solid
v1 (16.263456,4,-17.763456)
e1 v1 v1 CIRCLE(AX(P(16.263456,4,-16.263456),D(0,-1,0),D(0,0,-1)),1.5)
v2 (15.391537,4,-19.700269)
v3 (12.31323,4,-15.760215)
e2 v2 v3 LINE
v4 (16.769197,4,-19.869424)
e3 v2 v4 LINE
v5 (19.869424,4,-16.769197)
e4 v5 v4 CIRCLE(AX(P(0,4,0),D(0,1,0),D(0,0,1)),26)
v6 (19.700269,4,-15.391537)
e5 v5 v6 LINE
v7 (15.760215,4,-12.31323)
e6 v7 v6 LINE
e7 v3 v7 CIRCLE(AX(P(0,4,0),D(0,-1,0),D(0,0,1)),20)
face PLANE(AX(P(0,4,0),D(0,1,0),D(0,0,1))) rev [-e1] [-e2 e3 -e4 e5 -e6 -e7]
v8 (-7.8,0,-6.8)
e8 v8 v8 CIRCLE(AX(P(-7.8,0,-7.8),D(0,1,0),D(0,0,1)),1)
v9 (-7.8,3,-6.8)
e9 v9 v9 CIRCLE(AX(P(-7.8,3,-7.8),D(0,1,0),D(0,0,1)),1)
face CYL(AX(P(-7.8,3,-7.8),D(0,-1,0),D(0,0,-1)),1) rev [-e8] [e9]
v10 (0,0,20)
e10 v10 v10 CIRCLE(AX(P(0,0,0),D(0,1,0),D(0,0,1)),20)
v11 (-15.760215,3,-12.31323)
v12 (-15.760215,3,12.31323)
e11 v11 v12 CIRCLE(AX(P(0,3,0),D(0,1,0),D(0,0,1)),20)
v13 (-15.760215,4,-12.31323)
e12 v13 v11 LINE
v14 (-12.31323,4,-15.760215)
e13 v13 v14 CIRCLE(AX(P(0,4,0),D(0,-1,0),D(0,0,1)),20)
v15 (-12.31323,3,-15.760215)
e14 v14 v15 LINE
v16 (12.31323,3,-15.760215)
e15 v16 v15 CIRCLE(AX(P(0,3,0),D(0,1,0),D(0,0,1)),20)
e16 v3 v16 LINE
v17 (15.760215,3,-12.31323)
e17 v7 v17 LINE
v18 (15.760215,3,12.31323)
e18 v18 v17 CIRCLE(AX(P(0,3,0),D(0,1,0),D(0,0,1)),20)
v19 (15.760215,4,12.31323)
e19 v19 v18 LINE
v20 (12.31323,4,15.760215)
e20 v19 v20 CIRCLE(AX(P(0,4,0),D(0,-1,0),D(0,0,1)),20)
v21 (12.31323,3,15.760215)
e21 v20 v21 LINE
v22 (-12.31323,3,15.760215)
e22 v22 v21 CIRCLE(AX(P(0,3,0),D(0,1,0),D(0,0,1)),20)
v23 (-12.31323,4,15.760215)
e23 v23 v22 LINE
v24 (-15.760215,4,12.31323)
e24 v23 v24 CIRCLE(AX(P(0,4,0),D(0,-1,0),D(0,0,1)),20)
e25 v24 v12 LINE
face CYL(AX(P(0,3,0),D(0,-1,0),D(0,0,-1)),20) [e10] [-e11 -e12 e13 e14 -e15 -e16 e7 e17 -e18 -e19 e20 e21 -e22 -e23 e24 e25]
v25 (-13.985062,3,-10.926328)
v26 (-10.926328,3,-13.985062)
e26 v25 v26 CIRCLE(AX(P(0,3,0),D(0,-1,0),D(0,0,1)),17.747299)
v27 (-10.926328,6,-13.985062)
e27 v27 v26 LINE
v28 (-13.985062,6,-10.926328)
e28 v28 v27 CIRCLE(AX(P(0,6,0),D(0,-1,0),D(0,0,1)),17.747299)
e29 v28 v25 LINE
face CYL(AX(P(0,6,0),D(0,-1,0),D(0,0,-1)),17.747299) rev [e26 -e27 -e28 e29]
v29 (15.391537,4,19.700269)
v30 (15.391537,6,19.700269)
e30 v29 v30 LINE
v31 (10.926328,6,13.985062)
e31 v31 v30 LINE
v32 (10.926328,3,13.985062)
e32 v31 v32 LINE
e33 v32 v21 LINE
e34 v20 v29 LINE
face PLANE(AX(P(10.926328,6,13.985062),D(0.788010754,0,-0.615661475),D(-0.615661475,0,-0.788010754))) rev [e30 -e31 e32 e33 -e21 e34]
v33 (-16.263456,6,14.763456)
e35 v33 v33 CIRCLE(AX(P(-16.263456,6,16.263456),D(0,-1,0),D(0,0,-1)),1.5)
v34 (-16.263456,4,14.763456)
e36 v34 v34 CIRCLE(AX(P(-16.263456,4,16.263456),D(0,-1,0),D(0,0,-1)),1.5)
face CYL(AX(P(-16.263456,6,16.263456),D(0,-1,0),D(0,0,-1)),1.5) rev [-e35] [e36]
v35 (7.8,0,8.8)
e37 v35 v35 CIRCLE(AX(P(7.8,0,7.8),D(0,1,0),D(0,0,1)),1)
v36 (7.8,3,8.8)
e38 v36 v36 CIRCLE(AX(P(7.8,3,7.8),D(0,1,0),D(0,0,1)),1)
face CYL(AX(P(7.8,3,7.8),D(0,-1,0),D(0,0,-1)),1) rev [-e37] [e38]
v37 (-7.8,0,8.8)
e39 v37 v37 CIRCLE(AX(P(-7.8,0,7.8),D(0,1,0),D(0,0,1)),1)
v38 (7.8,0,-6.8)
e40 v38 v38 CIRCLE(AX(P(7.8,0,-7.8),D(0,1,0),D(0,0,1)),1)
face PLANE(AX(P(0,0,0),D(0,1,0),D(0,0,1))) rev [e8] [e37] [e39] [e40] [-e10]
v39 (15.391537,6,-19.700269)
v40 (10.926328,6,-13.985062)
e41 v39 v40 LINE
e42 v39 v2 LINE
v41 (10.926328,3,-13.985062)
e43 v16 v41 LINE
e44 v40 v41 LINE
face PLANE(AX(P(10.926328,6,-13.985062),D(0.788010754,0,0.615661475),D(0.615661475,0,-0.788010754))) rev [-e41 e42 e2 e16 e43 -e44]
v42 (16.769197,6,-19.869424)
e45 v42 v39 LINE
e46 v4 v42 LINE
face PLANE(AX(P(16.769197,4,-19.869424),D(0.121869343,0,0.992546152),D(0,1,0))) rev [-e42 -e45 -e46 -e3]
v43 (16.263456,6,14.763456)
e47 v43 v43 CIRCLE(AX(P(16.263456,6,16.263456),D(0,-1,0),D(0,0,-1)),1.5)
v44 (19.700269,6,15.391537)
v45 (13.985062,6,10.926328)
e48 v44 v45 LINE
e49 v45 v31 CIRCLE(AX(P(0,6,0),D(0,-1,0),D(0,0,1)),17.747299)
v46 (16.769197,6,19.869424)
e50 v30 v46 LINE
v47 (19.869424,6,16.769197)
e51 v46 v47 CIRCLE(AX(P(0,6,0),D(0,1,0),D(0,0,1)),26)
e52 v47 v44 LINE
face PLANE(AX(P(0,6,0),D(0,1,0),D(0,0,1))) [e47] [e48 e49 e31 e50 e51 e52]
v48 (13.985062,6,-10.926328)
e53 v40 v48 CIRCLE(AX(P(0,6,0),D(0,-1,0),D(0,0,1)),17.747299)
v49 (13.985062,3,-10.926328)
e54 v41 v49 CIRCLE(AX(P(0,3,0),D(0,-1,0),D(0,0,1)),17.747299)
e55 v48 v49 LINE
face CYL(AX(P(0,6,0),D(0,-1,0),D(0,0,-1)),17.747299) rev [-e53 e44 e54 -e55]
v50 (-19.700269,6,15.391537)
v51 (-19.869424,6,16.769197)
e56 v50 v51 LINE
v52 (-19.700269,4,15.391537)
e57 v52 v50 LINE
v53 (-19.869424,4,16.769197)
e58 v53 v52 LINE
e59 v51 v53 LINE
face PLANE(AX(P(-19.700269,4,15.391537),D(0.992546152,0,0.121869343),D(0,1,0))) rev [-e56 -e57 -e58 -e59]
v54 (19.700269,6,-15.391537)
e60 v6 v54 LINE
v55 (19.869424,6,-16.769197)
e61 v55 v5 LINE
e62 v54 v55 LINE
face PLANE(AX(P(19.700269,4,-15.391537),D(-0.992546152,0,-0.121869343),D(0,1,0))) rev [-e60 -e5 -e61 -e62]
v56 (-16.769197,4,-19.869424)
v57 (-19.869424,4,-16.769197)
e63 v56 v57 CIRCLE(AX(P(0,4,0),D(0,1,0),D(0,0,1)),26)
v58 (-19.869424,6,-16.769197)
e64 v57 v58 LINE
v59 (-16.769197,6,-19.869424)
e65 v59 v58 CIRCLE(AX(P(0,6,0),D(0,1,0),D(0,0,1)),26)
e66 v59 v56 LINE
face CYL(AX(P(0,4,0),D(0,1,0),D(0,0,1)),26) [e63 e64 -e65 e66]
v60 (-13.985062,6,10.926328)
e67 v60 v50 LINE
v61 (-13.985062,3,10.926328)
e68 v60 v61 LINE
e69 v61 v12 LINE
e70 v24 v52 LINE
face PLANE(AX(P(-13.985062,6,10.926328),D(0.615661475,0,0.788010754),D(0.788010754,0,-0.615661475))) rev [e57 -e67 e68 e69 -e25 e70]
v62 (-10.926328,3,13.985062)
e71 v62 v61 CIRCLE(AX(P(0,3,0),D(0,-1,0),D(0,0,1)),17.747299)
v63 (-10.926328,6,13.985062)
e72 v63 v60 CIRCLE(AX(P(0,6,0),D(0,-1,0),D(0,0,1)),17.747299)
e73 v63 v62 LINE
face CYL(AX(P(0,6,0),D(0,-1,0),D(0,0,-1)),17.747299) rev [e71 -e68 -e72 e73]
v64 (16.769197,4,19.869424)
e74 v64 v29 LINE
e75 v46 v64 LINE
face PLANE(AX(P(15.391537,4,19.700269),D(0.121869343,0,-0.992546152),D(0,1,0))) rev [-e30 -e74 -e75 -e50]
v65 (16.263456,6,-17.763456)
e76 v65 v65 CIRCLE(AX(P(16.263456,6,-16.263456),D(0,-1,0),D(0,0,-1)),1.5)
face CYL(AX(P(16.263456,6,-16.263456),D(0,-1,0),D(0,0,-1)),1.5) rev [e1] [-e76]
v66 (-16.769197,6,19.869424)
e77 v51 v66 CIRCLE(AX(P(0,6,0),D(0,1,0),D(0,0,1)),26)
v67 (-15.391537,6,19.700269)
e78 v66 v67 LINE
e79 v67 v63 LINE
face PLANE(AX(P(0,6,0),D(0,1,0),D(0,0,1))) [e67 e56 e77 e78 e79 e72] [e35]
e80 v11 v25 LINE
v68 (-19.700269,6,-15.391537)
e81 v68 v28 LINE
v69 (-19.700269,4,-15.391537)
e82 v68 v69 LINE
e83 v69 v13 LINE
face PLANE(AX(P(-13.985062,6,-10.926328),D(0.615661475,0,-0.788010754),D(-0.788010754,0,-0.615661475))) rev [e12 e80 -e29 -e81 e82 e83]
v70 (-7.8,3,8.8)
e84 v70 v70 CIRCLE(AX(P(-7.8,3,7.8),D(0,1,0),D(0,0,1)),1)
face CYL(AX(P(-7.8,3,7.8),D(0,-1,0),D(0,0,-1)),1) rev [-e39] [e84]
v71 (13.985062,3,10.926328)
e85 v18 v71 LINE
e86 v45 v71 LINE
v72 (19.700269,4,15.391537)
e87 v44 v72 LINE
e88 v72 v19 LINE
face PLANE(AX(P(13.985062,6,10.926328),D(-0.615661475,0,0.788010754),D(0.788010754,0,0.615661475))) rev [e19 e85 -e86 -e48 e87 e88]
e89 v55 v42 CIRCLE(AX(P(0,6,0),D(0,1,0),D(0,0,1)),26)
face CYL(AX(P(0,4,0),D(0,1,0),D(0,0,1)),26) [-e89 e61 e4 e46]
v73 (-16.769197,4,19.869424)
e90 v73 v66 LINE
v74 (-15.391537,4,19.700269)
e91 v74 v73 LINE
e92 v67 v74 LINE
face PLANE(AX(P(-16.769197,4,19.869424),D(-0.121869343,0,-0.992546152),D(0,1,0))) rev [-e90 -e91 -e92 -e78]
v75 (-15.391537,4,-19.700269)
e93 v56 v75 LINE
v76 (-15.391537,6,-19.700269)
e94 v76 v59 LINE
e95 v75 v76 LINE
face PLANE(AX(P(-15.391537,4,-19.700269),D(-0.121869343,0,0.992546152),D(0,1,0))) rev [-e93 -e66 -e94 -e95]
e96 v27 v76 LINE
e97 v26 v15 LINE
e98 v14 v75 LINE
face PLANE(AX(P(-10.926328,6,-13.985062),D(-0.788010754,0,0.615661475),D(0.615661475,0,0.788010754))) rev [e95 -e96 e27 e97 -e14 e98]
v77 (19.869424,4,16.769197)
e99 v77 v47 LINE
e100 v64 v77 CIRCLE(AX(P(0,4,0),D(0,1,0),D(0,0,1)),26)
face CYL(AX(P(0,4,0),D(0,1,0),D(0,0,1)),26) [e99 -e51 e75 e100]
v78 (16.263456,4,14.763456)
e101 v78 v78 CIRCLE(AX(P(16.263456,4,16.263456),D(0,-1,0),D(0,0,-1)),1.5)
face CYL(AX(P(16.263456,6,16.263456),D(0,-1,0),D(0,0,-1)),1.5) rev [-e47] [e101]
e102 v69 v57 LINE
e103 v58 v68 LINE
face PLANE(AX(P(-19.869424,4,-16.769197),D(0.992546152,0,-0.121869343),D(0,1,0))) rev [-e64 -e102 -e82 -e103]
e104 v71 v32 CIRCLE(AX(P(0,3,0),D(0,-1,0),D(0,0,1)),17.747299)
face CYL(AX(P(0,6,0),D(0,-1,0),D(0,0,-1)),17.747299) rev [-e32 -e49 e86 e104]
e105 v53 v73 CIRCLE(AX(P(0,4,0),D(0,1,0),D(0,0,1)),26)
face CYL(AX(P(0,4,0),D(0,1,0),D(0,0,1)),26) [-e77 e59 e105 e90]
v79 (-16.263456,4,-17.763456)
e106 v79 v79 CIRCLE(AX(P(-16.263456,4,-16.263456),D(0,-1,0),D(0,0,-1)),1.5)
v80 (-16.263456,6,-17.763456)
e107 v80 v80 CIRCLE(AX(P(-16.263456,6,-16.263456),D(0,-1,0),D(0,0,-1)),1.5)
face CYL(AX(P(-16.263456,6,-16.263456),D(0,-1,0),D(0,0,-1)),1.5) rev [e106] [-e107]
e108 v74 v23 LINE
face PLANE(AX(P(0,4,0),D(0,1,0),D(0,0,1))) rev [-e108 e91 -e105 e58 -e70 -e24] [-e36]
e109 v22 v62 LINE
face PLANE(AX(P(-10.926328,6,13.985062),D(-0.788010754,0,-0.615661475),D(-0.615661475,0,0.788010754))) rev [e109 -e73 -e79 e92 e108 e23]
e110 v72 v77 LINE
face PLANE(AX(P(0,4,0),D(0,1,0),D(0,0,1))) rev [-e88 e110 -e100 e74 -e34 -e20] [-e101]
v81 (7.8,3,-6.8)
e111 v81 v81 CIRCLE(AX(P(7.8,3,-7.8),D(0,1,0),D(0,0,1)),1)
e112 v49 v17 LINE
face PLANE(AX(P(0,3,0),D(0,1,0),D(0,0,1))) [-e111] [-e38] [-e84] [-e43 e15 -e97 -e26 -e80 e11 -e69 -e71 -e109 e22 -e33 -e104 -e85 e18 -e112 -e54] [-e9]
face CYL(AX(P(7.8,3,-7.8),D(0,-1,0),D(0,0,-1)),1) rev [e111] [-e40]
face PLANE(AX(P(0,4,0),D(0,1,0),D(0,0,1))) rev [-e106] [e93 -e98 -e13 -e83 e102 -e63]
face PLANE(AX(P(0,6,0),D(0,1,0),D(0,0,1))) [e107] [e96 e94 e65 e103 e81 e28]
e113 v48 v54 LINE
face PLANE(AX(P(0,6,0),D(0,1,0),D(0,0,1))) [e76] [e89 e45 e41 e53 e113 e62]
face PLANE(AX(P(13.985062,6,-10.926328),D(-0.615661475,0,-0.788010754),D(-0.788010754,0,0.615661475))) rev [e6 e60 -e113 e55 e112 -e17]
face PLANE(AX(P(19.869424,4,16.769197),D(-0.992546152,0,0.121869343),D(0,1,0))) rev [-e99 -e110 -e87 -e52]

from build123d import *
from build123d.topology import SkipClean

# Parameters (mm, degrees)
SKETCH1_R           = 20
SKETCH1_R_2         = 1
BOSS_EXTRUDE1_DEPTH = 3
BOSS_EXTRUDE2_DEPTH = 3
BOSS_EXTRUDE3_START = -2
BOSS_EXTRUDE3_DEPTH = 2
SKETCH4_R           = 1.5
CUT_EXTRUDE1_DEPTH  = 2
CHAMFER2_SIZE       = 1


with BuildPart() as part:
    # Sketch1 → Boss-Extrude1 (new body)
    with BuildSketch(Plane(origin=(0, 0, 0), x_dir=(1, 0, 0), z_dir=(0, 1, 0))):
        with Locations(Location((0, 0, 0), (0, 0, 270))):
            Circle(SKETCH1_R)
        with Locations(Location((-7.8, 7.8, 0), (0, 0, 270))):
            Circle(SKETCH1_R_2, mode=Mode.SUBTRACT)
        with Locations(Location((7.8, 7.8, 0), (0, 0, 270))):
            Circle(SKETCH1_R_2, mode=Mode.SUBTRACT)
        with Locations(Location((7.8, -7.8, 0), (0, 0, 270))):
            Circle(SKETCH1_R_2, mode=Mode.SUBTRACT)
        with Locations(Location((-7.8, -7.8, 0), (0, 0, 270))):
            Circle(SKETCH1_R_2, mode=Mode.SUBTRACT)
    extrude(amount=BOSS_EXTRUDE1_DEPTH)

    # Sketch2 → Boss-Extrude2 (add)
    with SkipClean():  # the faces are left unmerged after this step: merging them gives an invalid solid
        with BuildSketch(Plane(origin=(0, 3, 0), x_dir=(1, 0, 0), z_dir=(0, 1, 0))):
            with BuildLine():
                Line((-10.926328273, 13.985062443), (-12.313229507, 15.760215072))
                ThreePointArc((-12.313229507, 15.760215072), (-14.142135624, 14.142135624), (-15.760215072, 12.313229507))
                Line((-15.760215072, 12.313229507), (-13.985062443, 10.926328273))
                ThreePointArc((-13.985062443, 10.926328273), (-12.549235456, 12.549235456), (-10.926328273, 13.985062443))
            make_face()
            with BuildLine():
                Line((10.926328273, 13.985062443), (12.313229507, 15.760215072))
                ThreePointArc((12.313229507, 15.760215072), (14.142135624, 14.142135624), (15.760215072, 12.313229507))
                Line((15.760215072, 12.313229507), (13.985062443, 10.926328273))
                ThreePointArc((13.985062443, 10.926328273), (12.549235456, 12.549235456), (10.926328273, 13.985062443))
            make_face()
            with BuildLine():
                Line((13.985062443, -10.926328273), (15.760215072, -12.313229507))
                ThreePointArc((15.760215072, -12.313229507), (14.142135624, -14.142135624), (12.313229507, -15.760215072))
                Line((12.313229507, -15.760215072), (10.926328273, -13.985062443))
                ThreePointArc((10.926328273, -13.985062443), (12.549235456, -12.549235456), (13.985062443, -10.926328273))
            make_face()
            with BuildLine():
                Line((-10.926328273, -13.985062443), (-12.313229507, -15.760215072))
                ThreePointArc((-12.313229507, -15.760215072), (-14.142135624, -14.142135624), (-15.760215072, -12.313229507))
                Line((-15.760215072, -12.313229507), (-13.985062443, -10.926328273))
                ThreePointArc((-13.985062443, -10.926328273), (-12.549235456, -12.549235456), (-10.926328273, -13.985062443))
            make_face()
        extrude(amount=BOSS_EXTRUDE2_DEPTH)

    # Sketch3 → Boss-Extrude3 (add)
    with SkipClean():  # the faces are left unmerged after this step: merging them gives an invalid solid
        with BuildSketch(Plane(origin=(0, 6, 0), x_dir=(1, 0, 0), z_dir=(0, 1, 0)).offset(BOSS_EXTRUDE3_START)):
            with BuildLine():
                Line((12.313229507, 15.760215072), (16.007198358, 20.488279594))
                ThreePointArc((16.007198358, 20.488279594), (18.384776311, 18.384776311), (20.488279594, 16.007198358))
                Line((20.488279594, 16.007198358), (15.760215072, 12.313229507))
                ThreePointArc((15.760215072, 12.313229507), (14.142135624, 14.142135624), (12.313229507, 15.760215072))
            make_face()
            with BuildLine():
                Line((-12.313229507, 15.760215072), (-16.007198358, 20.488279594))
                ThreePointArc((-16.007198358, 20.488279594), (-18.384776311, 18.384776311), (-20.488279594, 16.007198358))
                Line((-20.488279594, 16.007198358), (-15.760215072, 12.313229507))
                ThreePointArc((-15.760215072, 12.313229507), (-14.142135624, 14.142135624), (-12.313229507, 15.760215072))
            make_face()
            with BuildLine():
                Line((15.760215072, -12.313229507), (20.488279594, -16.007198358))
                ThreePointArc((20.488279594, -16.007198358), (18.384776311, -18.384776311), (16.007198358, -20.488279594))
                Line((16.007198358, -20.488279594), (12.313229507, -15.760215072))
                ThreePointArc((12.313229507, -15.760215072), (14.142135624, -14.142135624), (15.760215072, -12.313229507))
            make_face()
            with BuildLine():
                Line((-12.313229507, -15.760215072), (-16.007198358, -20.488279594))
                ThreePointArc((-16.007198358, -20.488279594), (-18.384776311, -18.384776311), (-20.488279594, -16.007198358))
                Line((-20.488279594, -16.007198358), (-15.760215072, -12.313229507))
                ThreePointArc((-15.760215072, -12.313229507), (-14.142135624, -14.142135624), (-12.313229507, -15.760215072))
            make_face()
        extrude(amount=BOSS_EXTRUDE3_DEPTH)

    # Sketch4 → Cut-Extrude1 (cut)
    with SkipClean():  # the faces are left unmerged after this step: merging them gives an invalid solid
        with BuildSketch(Plane.XZ.offset(-4)):
            with Locations(Location((-16.263455967, -16.263455967, 0), (0, 0, 270))):
                Circle(SKETCH4_R)
            with Locations(Location((-16.263455967, 16.263455967, 0), (0, 0, 270))):
                Circle(SKETCH4_R)
            with Locations(Location((16.263455967, 16.263455967, 0), (0, 0, 270))):
                Circle(SKETCH4_R)
            with Locations(Location((16.263455967, -16.263455967, 0), (0, 0, 270))):
                Circle(SKETCH4_R)
        extrude(amount=-CUT_EXTRUDE1_DEPTH, mode=Mode.SUBTRACT)

    # Chamfer2
    # the kernel refuses this chamfer: 1 mm, written as the material it takes off along each edge
    with BuildSketch(Plane(origin=(-16.007198358, 1.428317012, 20.488279594), x_dir=(0.615661475325629, 0, -0.788010753606745), z_dir=(0, 1, 0)), Plane(origin=(20.488279594, 1.428317012, 16.007198358), x_dir=(-0.7880107536067236, 0, -0.6156614753256563), z_dir=(0, 1, 0)), Plane(origin=(16.007198358, 1.428317012, -20.488279594), x_dir=(-0.6156614753256462, 0, 0.7880107536067315), z_dir=(0, 1, 0)), Plane(origin=(-20.488279594, 1.428317012, -16.007198358), x_dir=(0.7880107536067239, 0, 0.6156614753256557), z_dir=(0, 1, 0))) as chamfer2_piece_1:
        with BuildLine():
            Line((CHAMFER2_SIZE, 0), (0.018531237, 0.981468763))
            ThreePointArc((0.018531237, 0.981468763), (0.004898706, 0.504686734), (0, 0))
            Line((0, 0), (CHAMFER2_SIZE, 0))
        make_face()
    extrude(amount=7.143365976, mode=Mode.SUBTRACT)
    with BuildSketch(Plane(origin=(-20.488279594, 1.428317012, 16.007198358), x_dir=(0.7880107536066959, 0, -0.6156614753256917), z_dir=(0, 1, 0)), Plane(origin=(16.007198358, 1.428317012, 20.488279594), x_dir=(-0.6156614753256615, 0, -0.7880107536067196), z_dir=(0, 1, 0)), Plane(origin=(20.488279594, 1.428317012, -16.007198358), x_dir=(-0.7880107536067122, 0, 0.615661475325671), z_dir=(0, 1, 0)), Plane(origin=(-16.007198358, 1.428317012, -20.488279594), x_dir=(0.615661475325662, 0, 0.7880107536067191), z_dir=(0, 1, 0))) as chamfer2_piece_2:
        with BuildLine():
            Line((CHAMFER2_SIZE, 0), (0.018531237, -0.981468763))
            ThreePointArc((0.018531237, -0.981468763), (0.004898706, -0.504686734), (0, 0))
            Line((0, 0), (CHAMFER2_SIZE, 0))
        make_face()
    extrude(amount=7.143365976, mode=Mode.SUBTRACT)


solid = part.part
